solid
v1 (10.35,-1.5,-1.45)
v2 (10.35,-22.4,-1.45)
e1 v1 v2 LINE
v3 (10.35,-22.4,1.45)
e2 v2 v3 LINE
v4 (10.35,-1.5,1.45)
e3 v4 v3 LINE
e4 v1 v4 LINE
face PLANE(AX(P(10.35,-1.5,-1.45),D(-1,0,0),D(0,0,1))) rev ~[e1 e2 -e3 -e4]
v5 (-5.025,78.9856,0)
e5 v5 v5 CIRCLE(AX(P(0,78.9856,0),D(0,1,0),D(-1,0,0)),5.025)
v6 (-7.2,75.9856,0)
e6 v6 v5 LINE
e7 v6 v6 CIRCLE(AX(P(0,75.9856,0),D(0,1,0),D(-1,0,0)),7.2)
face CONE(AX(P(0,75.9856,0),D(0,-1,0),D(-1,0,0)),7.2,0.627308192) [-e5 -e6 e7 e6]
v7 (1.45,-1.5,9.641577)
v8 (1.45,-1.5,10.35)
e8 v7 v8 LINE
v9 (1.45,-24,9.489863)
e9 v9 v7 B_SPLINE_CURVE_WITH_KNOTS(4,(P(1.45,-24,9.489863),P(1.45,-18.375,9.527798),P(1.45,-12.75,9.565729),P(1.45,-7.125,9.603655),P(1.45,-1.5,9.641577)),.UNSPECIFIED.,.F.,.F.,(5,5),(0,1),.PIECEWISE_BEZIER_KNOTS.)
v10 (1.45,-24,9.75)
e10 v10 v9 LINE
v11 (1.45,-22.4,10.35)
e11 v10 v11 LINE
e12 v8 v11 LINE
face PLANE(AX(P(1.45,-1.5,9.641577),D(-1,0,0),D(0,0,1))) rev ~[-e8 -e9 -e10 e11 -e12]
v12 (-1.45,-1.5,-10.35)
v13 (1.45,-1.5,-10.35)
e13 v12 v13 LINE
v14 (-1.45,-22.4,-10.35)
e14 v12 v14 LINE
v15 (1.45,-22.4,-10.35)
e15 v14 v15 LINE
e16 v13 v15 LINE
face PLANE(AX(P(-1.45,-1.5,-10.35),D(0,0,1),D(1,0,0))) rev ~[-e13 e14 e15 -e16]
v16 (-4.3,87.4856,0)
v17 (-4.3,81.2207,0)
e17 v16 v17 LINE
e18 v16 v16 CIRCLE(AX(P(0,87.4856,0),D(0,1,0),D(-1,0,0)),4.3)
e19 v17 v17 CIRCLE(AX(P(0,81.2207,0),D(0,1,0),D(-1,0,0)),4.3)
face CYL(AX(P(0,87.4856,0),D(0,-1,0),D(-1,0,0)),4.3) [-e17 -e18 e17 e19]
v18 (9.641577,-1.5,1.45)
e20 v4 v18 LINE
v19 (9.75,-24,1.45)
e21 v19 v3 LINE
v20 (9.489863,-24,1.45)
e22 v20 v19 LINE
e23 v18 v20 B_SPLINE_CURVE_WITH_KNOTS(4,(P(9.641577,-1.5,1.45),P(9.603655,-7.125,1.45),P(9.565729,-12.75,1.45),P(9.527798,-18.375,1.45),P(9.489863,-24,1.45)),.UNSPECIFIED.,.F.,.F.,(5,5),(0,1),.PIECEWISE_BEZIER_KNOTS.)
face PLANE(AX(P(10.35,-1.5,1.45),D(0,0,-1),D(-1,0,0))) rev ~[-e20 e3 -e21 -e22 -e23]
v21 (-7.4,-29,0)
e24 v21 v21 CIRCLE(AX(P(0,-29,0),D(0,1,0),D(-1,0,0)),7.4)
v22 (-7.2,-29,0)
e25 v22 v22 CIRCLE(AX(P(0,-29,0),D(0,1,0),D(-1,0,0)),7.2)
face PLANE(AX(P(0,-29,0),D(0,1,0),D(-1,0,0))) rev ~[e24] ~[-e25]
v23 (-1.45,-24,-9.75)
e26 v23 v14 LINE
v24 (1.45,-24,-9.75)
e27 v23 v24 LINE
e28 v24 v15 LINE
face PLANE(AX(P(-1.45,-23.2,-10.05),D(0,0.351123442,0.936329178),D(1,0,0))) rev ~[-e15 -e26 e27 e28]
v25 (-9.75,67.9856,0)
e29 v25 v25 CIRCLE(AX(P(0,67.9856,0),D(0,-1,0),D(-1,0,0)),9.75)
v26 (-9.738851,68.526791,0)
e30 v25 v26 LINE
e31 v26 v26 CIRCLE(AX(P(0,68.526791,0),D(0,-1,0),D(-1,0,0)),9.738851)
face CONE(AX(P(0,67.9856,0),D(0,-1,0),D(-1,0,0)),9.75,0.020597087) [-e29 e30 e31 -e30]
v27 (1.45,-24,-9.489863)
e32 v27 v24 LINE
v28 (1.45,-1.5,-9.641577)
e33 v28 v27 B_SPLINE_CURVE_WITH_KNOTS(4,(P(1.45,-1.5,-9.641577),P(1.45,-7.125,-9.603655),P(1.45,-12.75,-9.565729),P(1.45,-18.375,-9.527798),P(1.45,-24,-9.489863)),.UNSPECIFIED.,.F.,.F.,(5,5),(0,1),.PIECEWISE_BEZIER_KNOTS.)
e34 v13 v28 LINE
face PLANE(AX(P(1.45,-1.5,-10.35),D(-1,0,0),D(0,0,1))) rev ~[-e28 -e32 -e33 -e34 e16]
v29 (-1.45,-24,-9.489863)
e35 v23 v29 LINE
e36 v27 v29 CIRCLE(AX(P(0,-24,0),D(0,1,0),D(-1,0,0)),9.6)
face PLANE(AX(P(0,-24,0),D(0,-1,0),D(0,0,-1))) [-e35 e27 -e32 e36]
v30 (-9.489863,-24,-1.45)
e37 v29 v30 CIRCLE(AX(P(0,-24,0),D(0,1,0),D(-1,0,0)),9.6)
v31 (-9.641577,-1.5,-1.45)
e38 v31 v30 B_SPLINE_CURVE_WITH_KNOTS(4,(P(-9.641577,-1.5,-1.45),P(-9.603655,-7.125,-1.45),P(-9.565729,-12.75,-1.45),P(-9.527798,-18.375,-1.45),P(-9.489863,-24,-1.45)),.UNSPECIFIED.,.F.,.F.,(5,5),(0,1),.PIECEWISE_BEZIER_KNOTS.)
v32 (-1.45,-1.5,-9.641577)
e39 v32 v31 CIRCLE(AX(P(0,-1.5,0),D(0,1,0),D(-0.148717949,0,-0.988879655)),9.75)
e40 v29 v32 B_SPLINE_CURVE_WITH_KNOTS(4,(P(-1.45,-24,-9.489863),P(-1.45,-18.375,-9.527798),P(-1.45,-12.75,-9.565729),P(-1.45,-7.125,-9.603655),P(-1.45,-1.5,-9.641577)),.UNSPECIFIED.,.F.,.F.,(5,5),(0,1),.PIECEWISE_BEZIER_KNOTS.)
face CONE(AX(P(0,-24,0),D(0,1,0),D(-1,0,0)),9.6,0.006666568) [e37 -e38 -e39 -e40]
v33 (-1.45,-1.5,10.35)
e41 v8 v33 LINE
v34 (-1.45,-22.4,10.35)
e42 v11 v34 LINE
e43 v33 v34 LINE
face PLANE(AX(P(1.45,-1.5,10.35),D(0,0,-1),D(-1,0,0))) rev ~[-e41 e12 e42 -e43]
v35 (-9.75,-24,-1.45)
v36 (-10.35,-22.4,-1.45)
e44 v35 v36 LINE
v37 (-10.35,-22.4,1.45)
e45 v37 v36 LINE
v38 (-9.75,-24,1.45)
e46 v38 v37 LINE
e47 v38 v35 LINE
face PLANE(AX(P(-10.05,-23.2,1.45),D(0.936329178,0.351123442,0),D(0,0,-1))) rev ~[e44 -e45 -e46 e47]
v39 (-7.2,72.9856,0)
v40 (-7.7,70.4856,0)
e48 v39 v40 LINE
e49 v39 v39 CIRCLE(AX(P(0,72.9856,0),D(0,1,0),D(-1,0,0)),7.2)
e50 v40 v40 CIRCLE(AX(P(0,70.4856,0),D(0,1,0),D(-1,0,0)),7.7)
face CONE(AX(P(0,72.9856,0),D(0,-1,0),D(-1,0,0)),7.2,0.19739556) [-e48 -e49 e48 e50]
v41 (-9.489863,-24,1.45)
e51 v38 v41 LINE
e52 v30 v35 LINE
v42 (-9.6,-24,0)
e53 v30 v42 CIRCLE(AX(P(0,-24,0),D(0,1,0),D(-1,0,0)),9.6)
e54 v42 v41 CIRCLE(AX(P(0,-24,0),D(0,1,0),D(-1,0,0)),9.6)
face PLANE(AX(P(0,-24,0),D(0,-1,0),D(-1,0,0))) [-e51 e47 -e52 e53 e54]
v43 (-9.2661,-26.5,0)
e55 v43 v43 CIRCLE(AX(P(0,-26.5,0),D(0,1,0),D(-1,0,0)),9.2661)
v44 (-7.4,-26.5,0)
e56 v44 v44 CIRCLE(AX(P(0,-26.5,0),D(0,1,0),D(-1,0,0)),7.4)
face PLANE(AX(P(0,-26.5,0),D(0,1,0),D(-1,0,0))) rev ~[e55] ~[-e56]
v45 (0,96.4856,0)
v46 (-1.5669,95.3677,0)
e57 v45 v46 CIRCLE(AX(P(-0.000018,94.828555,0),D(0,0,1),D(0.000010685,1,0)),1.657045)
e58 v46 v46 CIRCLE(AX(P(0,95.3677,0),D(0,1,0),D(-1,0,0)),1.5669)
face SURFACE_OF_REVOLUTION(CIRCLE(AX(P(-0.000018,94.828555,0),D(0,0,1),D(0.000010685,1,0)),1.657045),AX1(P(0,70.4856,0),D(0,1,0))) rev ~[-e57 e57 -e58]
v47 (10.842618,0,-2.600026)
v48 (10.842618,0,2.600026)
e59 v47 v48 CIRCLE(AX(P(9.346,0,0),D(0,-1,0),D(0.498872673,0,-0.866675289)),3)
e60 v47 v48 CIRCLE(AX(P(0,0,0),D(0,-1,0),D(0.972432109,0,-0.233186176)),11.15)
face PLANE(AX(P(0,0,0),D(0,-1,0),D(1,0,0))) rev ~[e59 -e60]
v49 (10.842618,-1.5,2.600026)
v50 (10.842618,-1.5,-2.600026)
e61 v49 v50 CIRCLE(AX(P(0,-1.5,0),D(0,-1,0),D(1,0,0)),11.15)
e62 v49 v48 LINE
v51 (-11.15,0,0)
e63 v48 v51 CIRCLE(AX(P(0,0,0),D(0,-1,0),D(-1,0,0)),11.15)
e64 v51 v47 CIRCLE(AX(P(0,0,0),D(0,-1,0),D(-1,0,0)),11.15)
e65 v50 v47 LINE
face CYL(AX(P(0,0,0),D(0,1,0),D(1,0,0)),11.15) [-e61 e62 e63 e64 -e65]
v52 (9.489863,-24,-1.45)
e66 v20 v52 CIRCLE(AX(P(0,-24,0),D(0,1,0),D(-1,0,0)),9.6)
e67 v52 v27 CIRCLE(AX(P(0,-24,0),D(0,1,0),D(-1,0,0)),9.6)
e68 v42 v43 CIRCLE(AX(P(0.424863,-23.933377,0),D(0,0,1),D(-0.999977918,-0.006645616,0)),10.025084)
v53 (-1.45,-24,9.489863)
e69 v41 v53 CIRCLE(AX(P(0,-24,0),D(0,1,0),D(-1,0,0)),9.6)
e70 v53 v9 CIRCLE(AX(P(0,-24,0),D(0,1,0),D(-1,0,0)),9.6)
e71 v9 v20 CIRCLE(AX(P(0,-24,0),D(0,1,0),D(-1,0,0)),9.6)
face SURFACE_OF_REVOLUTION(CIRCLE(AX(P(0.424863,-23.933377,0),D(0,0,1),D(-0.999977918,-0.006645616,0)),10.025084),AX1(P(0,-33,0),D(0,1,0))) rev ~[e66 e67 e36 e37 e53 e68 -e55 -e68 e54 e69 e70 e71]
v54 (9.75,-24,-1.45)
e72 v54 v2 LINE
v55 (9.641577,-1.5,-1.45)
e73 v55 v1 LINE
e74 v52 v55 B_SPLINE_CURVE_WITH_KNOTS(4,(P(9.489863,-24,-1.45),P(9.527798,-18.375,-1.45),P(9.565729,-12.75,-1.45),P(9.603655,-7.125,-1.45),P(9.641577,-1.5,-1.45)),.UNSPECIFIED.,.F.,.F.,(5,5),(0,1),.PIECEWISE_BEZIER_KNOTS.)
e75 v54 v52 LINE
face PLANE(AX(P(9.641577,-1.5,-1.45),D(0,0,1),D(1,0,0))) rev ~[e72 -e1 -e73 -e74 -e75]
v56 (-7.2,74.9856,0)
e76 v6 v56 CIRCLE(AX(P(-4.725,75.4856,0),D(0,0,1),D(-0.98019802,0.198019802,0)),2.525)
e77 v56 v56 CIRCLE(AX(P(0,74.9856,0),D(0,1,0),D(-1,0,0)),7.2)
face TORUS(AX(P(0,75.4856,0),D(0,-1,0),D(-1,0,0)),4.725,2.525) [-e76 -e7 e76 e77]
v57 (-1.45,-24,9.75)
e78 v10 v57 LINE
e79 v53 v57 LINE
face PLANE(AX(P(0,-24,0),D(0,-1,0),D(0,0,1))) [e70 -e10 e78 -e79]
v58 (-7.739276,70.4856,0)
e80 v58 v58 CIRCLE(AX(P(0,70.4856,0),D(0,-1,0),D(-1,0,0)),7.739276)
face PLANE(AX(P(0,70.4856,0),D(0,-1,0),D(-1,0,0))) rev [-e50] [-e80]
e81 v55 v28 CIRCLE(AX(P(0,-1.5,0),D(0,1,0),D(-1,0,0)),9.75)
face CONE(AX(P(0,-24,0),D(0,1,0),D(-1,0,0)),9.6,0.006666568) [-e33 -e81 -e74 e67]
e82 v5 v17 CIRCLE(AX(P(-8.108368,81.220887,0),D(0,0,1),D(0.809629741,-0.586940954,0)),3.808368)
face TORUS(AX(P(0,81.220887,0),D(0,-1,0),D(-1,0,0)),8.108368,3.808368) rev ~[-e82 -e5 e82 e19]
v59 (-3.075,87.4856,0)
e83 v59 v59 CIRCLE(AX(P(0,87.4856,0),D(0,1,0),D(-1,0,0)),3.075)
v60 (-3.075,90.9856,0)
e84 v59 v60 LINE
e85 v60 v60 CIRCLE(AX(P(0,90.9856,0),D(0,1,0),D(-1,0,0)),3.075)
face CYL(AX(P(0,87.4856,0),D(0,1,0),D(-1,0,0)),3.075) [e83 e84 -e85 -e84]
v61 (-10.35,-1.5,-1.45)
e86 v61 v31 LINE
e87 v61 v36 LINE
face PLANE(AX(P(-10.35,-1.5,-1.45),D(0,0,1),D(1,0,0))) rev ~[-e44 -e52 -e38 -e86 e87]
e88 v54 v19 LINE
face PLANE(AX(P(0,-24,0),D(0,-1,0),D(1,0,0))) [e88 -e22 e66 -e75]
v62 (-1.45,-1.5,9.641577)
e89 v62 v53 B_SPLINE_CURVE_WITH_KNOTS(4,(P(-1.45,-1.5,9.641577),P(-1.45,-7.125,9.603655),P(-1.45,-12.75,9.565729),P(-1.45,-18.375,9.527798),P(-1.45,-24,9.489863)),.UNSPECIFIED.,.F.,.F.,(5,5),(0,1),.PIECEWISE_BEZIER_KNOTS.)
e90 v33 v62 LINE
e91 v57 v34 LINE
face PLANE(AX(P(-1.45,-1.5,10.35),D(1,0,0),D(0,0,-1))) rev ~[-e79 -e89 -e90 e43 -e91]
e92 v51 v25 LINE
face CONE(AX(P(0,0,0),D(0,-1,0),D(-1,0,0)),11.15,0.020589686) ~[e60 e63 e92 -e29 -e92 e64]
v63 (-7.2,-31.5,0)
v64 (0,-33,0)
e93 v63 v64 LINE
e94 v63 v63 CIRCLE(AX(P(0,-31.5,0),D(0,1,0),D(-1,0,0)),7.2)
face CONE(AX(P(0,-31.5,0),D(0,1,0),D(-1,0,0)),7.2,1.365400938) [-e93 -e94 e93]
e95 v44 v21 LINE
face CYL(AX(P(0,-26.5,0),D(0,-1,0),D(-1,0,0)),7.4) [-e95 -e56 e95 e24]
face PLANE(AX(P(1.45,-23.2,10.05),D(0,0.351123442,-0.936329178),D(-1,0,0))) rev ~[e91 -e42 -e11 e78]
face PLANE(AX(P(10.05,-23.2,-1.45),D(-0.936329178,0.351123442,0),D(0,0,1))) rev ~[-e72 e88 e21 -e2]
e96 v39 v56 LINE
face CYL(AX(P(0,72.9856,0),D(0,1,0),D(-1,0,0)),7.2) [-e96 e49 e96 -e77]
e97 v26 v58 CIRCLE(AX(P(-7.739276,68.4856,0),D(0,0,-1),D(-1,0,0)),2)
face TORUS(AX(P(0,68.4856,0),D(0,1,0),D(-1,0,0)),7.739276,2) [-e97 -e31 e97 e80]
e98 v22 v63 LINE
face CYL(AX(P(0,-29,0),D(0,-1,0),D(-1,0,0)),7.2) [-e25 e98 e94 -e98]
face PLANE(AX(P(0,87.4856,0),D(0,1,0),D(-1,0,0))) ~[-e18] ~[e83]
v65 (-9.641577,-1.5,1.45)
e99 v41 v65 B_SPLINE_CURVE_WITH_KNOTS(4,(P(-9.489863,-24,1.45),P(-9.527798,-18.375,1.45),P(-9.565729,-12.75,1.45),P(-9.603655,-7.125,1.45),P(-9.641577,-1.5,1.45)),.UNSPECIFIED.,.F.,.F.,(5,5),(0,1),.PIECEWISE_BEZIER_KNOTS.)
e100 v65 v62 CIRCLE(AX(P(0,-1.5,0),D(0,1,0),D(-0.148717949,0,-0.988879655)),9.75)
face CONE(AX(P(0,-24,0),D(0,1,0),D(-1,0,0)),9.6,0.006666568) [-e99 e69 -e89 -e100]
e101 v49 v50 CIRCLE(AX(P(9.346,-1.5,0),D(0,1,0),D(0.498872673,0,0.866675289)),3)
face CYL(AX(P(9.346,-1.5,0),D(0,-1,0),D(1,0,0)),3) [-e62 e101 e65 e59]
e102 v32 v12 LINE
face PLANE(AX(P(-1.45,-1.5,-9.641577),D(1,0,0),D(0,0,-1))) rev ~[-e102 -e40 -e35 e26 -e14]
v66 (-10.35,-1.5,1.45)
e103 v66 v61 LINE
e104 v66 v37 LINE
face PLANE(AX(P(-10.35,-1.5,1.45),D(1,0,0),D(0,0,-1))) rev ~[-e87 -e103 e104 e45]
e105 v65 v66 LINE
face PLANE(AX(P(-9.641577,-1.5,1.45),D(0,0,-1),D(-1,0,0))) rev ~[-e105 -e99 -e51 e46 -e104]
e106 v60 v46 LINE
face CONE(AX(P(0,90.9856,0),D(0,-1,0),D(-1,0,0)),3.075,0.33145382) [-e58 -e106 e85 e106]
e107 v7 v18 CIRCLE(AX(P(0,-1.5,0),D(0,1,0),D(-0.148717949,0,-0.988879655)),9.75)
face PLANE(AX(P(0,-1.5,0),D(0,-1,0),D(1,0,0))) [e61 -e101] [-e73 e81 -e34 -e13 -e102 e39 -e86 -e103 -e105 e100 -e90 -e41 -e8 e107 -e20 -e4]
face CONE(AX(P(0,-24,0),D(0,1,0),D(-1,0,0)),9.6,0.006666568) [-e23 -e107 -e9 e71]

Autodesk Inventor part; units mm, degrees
ref_plane "YZ Plane" through (0, 0, 0) normal (1, 0, 0) x (0, 1, 0)
ref_plane "XZ Plane" through (0, 0, 0) normal (0, 1, 0) x (-1, 0, 0)
ref_plane "XY Plane" through (0, 0, 0) normal (0, 0, 1) x (1, 0, 0)
sketch "Эскиз1" plane through (0, 0, 0) normal (0, 0, 1) x (1, 0, 0)
  line L0 (0, 0) -> (-11.15, 0)
  line L1 (-11.15, 0) -> (-9.75, 67.9856)
  line L2 (-9.75, 67.9856) -> (0, 67.9856)
  line L3 (0, 67.9856) -> (0, 0)
  line L4 (0, 67.9856) -> (0, 70.4856)
  line L5 (-9.75, 67.9856) -> (-9.6985, 70.4856)
  line L6 (0, 70.4856) -> (-9.6985, 70.4856)
  dimension "d0" = 11.15
  dimension "d1" = 9.75
  dimension "d2" = 68
  dimension "d3" = 2.5
revolve "Вращение1" add sketch "Эскиз1" angle 360 about axis through (0, 67.9856, 0) along (0, -1, 0)
fillet "Сопряжение1" radius 2 1 edges at (9.6985, 70.4856, 0)
sketch "Эскиз2" plane through (0, 0, 0) normal (0, 0, 1) x (1, 0, 0)
  line L0 (-7.7393, 70.4856) -> (7.7393, 70.4856) projected
  line L1 (0, 70.4856) -> (0, 72.9856)
  line L2 (0, 72.9856) -> (-7.2, 72.9856)
  line L3 (-7.2, 72.9856) -> (-7.7, 70.4856)
  line L4 (0, 72.9856) -> (-7.2, 72.9856)
  line L5 (-7.2, 72.9856) -> (-7.2, 74.9856)
  line L6 (-7.2, 74.9856) -> (0, 74.9856)
  line L7 (0, 74.9856) -> (0, 72.9856)
  line L8 (-7.2, 75.9856) -> (0, 75.9856)
  line L9 (0, 75.9856) -> (0, 74.9856)
  arc A0 (-7.2, 75.9856) -> (-7.2, 74.9856) centre (-4.725, 75.4856) ccw
  line L10 (-7.2, 75.9856) -> (-4.3, 79.9856)
  line L11 (-4.3, 79.9856) -> (0, 79.9856)
  line L12 (0, 79.9856) -> (0, 75.9856)
  line L13 (-4.3, 79.9856) -> (0, 79.9856)
  line L14 (0, 79.9856) -> (0, 87.4856)
  line L15 (0, 87.4856) -> (-4.3, 87.4856)
  line L16 (-4.3, 87.4856) -> (-4.3, 79.9856)
  arc A1 (-5.025, 78.9856) -> (-4.3, 81.2207) centre (-8.108, 81.2207) ccw
  line L17 (0, 87.4856) -> (-3.075, 87.4856)
  line L18 (-3.075, 87.4856) -> (-3.075, 90.9856)
  line L19 (-3.075, 90.9856) -> (0, 90.9856)
  line L20 (0, 90.9856) -> (0, 87.4856)
  line L21 (-3.075, 90.9856) -> (-1.5669, 95.3677)
  arc A2 (0, 96.4856) -> (-1.5669, 95.3677) centre (0, 94.8285) ccw
  line L22 (0, 90.9856) -> (0, 96.4856)
  point P0 (0, 0)
  point P1 (-7.25, 75.4856)
  point P2 (-3.075, 87.4856)
  dimension "d6" = 7.2
  dimension "d7" = 7.7
  dimension "d8" = 2.5
  dimension "d9" = 2
  dimension "d10" = 1
  dimension "d12" = 0.05
  dimension "d13" = 4.3
  dimension "d14" = 4
  dimension "d15" = 17
  dimension "d16" = 1
  dimension "d17" = 1.2352
  dimension "d18" = 3.075
  dimension "d19" = 3.5
  dimension "d20" = 5.5
revolve "Вращение2" add sketch "Эскиз2" angle 360 about axis through (0, 79.9856, 0) along (0, 1, 0)
sketch "Эскиз3" plane through (0, 0, 0) normal (0, -1, 0) x (1, 0, 0)
  circle A0 centre (0, 0) radius 11.15 projected
extrude "Выдавливание1" add sketch "Эскиз3" along normal blind 1.5
sketch "Эскиз4" plane through (0, 0, 0) normal (0, 0, 1) x (1, 0, 0)
  line L0 (-11.15, -1.5) -> (11.15, -1.5) projected
  line L1 (0, -1.5) -> (0, -24)
  line L2 (0, -24) -> (-9.6, -24)
  line L3 (-9.6, -24) -> (-9.75, -1.5)
  line L4 (-9.75, -1.5) -> (0, -1.5)
  line L5 (-9.6, -24) -> (-9.5833, -26.5)
  line L6 (-9.5833, -26.5) -> (0, -26.5)
  line L7 (0, -26.5) -> (0, -24)
  arc A0 (-9.6, -24) -> (-9.2661, -26.5) centre (0.4274, -23.9332) ccw
  line L8 (0, -26.5) -> (-7.4, -26.5)
  line L9 (-7.4, -26.5) -> (-7.4, -29)
  line L10 (-7.4, -29) -> (0, -29)
  line L11 (0, -29) -> (0, -26.5)
  line L12 (0, -29) -> (-7.2, -29)
  line L13 (-7.2, -29) -> (-7.2, -31.5)
  line L14 (-7.2, -31.5) -> (0, -31.5)
  line L15 (0, -31.5) -> (0, -29)
  line L16 (-7.2, -31.5) -> (0, -33)
  line L17 (0, -31.5) -> (0, -33)
  point P0 (0, 0)
  point P1 (-9.75, -1.5)
  dimension "d24" = 9.6
  dimension "d25" = 9.75
  dimension "d26" = 22.5
  dimension "d27" = 2.5
  dimension "d28" = 2.5
  dimension "d29" = 7.4
  dimension "d30" = 2.5
  dimension "d31" = 7.2
  dimension "d32" = 1.5
revolve "Вращение3" add sketch "Эскиз4" angle 360 about axis through (0, -29, 0) along (0, 1, 0) contours L0 L1 L2 L3 | L2 L7 L6 A0 | L11 L10 L9 L6 | L15 L14 L13 L10 | L17 L16 L14
sketch "Эскиз5" plane through (0, -1.5, 0) normal (0, -1, 0) x (1, 0, 0)
  circle A0 centre (0, 0) radius 11.15 projected
  circle A1 centre (9.346, 0) radius 3
  circle A2 centre (0, 0) radius 11.15 projected
  point P0 (0, 0)
  point P1 (10.8426, -2.6)
  point P2 (10.8426, 2.6)
  point P3 (10.8426, -2.6)
  dimension "d48" = 5.2
  dimension "d50" = 6
  dimension "d51" = 2.6
sketch "Эскиз6" plane through (0, -1.5, 0) normal (0, -1, 0) x (1, 0, 0)
  line L0 (10.35, 1.45) -> (8.1099, 1.45)
  line L1 (8.1099, 1.45) -> (8.1099, -1.45)
  line L2 (8.1099, -1.45) -> (10.35, -1.45)
  line L3 (10.35, -1.45) -> (10.35, 1.45)
  circle A0 centre (0, 0) radius 9.75 projected
  point P0 (0, 0)
  dimension "d37" = 2.9
  dimension "d38" = 1.45
  dimension "d39" = 0.6
extrude "Выдавливание3" add sketch "Эскиз6" along normal blind 22.5 contours L3 L2 A0 L0 | A0 L2 L1 L0 picked at (8.6566, 0)
chamfer "Фаска1" distance 0.6 distance2 1.6 1 edges at (10.35, -24, 0) measured on face at (10.0959, -24, 0.1617)
pattern_circular "Круговой массив1" count 4 over 360 about axis through (0, -10, 0) along (0, 1, 0) of "Выдавливание3", "Фаска1"
extrude "Выдавливание4" add sketch "Эскиз5" against normal blind 1.5 contours A0 A1 picked at (11.5153, -0.4994)
properties part number "маркер"
